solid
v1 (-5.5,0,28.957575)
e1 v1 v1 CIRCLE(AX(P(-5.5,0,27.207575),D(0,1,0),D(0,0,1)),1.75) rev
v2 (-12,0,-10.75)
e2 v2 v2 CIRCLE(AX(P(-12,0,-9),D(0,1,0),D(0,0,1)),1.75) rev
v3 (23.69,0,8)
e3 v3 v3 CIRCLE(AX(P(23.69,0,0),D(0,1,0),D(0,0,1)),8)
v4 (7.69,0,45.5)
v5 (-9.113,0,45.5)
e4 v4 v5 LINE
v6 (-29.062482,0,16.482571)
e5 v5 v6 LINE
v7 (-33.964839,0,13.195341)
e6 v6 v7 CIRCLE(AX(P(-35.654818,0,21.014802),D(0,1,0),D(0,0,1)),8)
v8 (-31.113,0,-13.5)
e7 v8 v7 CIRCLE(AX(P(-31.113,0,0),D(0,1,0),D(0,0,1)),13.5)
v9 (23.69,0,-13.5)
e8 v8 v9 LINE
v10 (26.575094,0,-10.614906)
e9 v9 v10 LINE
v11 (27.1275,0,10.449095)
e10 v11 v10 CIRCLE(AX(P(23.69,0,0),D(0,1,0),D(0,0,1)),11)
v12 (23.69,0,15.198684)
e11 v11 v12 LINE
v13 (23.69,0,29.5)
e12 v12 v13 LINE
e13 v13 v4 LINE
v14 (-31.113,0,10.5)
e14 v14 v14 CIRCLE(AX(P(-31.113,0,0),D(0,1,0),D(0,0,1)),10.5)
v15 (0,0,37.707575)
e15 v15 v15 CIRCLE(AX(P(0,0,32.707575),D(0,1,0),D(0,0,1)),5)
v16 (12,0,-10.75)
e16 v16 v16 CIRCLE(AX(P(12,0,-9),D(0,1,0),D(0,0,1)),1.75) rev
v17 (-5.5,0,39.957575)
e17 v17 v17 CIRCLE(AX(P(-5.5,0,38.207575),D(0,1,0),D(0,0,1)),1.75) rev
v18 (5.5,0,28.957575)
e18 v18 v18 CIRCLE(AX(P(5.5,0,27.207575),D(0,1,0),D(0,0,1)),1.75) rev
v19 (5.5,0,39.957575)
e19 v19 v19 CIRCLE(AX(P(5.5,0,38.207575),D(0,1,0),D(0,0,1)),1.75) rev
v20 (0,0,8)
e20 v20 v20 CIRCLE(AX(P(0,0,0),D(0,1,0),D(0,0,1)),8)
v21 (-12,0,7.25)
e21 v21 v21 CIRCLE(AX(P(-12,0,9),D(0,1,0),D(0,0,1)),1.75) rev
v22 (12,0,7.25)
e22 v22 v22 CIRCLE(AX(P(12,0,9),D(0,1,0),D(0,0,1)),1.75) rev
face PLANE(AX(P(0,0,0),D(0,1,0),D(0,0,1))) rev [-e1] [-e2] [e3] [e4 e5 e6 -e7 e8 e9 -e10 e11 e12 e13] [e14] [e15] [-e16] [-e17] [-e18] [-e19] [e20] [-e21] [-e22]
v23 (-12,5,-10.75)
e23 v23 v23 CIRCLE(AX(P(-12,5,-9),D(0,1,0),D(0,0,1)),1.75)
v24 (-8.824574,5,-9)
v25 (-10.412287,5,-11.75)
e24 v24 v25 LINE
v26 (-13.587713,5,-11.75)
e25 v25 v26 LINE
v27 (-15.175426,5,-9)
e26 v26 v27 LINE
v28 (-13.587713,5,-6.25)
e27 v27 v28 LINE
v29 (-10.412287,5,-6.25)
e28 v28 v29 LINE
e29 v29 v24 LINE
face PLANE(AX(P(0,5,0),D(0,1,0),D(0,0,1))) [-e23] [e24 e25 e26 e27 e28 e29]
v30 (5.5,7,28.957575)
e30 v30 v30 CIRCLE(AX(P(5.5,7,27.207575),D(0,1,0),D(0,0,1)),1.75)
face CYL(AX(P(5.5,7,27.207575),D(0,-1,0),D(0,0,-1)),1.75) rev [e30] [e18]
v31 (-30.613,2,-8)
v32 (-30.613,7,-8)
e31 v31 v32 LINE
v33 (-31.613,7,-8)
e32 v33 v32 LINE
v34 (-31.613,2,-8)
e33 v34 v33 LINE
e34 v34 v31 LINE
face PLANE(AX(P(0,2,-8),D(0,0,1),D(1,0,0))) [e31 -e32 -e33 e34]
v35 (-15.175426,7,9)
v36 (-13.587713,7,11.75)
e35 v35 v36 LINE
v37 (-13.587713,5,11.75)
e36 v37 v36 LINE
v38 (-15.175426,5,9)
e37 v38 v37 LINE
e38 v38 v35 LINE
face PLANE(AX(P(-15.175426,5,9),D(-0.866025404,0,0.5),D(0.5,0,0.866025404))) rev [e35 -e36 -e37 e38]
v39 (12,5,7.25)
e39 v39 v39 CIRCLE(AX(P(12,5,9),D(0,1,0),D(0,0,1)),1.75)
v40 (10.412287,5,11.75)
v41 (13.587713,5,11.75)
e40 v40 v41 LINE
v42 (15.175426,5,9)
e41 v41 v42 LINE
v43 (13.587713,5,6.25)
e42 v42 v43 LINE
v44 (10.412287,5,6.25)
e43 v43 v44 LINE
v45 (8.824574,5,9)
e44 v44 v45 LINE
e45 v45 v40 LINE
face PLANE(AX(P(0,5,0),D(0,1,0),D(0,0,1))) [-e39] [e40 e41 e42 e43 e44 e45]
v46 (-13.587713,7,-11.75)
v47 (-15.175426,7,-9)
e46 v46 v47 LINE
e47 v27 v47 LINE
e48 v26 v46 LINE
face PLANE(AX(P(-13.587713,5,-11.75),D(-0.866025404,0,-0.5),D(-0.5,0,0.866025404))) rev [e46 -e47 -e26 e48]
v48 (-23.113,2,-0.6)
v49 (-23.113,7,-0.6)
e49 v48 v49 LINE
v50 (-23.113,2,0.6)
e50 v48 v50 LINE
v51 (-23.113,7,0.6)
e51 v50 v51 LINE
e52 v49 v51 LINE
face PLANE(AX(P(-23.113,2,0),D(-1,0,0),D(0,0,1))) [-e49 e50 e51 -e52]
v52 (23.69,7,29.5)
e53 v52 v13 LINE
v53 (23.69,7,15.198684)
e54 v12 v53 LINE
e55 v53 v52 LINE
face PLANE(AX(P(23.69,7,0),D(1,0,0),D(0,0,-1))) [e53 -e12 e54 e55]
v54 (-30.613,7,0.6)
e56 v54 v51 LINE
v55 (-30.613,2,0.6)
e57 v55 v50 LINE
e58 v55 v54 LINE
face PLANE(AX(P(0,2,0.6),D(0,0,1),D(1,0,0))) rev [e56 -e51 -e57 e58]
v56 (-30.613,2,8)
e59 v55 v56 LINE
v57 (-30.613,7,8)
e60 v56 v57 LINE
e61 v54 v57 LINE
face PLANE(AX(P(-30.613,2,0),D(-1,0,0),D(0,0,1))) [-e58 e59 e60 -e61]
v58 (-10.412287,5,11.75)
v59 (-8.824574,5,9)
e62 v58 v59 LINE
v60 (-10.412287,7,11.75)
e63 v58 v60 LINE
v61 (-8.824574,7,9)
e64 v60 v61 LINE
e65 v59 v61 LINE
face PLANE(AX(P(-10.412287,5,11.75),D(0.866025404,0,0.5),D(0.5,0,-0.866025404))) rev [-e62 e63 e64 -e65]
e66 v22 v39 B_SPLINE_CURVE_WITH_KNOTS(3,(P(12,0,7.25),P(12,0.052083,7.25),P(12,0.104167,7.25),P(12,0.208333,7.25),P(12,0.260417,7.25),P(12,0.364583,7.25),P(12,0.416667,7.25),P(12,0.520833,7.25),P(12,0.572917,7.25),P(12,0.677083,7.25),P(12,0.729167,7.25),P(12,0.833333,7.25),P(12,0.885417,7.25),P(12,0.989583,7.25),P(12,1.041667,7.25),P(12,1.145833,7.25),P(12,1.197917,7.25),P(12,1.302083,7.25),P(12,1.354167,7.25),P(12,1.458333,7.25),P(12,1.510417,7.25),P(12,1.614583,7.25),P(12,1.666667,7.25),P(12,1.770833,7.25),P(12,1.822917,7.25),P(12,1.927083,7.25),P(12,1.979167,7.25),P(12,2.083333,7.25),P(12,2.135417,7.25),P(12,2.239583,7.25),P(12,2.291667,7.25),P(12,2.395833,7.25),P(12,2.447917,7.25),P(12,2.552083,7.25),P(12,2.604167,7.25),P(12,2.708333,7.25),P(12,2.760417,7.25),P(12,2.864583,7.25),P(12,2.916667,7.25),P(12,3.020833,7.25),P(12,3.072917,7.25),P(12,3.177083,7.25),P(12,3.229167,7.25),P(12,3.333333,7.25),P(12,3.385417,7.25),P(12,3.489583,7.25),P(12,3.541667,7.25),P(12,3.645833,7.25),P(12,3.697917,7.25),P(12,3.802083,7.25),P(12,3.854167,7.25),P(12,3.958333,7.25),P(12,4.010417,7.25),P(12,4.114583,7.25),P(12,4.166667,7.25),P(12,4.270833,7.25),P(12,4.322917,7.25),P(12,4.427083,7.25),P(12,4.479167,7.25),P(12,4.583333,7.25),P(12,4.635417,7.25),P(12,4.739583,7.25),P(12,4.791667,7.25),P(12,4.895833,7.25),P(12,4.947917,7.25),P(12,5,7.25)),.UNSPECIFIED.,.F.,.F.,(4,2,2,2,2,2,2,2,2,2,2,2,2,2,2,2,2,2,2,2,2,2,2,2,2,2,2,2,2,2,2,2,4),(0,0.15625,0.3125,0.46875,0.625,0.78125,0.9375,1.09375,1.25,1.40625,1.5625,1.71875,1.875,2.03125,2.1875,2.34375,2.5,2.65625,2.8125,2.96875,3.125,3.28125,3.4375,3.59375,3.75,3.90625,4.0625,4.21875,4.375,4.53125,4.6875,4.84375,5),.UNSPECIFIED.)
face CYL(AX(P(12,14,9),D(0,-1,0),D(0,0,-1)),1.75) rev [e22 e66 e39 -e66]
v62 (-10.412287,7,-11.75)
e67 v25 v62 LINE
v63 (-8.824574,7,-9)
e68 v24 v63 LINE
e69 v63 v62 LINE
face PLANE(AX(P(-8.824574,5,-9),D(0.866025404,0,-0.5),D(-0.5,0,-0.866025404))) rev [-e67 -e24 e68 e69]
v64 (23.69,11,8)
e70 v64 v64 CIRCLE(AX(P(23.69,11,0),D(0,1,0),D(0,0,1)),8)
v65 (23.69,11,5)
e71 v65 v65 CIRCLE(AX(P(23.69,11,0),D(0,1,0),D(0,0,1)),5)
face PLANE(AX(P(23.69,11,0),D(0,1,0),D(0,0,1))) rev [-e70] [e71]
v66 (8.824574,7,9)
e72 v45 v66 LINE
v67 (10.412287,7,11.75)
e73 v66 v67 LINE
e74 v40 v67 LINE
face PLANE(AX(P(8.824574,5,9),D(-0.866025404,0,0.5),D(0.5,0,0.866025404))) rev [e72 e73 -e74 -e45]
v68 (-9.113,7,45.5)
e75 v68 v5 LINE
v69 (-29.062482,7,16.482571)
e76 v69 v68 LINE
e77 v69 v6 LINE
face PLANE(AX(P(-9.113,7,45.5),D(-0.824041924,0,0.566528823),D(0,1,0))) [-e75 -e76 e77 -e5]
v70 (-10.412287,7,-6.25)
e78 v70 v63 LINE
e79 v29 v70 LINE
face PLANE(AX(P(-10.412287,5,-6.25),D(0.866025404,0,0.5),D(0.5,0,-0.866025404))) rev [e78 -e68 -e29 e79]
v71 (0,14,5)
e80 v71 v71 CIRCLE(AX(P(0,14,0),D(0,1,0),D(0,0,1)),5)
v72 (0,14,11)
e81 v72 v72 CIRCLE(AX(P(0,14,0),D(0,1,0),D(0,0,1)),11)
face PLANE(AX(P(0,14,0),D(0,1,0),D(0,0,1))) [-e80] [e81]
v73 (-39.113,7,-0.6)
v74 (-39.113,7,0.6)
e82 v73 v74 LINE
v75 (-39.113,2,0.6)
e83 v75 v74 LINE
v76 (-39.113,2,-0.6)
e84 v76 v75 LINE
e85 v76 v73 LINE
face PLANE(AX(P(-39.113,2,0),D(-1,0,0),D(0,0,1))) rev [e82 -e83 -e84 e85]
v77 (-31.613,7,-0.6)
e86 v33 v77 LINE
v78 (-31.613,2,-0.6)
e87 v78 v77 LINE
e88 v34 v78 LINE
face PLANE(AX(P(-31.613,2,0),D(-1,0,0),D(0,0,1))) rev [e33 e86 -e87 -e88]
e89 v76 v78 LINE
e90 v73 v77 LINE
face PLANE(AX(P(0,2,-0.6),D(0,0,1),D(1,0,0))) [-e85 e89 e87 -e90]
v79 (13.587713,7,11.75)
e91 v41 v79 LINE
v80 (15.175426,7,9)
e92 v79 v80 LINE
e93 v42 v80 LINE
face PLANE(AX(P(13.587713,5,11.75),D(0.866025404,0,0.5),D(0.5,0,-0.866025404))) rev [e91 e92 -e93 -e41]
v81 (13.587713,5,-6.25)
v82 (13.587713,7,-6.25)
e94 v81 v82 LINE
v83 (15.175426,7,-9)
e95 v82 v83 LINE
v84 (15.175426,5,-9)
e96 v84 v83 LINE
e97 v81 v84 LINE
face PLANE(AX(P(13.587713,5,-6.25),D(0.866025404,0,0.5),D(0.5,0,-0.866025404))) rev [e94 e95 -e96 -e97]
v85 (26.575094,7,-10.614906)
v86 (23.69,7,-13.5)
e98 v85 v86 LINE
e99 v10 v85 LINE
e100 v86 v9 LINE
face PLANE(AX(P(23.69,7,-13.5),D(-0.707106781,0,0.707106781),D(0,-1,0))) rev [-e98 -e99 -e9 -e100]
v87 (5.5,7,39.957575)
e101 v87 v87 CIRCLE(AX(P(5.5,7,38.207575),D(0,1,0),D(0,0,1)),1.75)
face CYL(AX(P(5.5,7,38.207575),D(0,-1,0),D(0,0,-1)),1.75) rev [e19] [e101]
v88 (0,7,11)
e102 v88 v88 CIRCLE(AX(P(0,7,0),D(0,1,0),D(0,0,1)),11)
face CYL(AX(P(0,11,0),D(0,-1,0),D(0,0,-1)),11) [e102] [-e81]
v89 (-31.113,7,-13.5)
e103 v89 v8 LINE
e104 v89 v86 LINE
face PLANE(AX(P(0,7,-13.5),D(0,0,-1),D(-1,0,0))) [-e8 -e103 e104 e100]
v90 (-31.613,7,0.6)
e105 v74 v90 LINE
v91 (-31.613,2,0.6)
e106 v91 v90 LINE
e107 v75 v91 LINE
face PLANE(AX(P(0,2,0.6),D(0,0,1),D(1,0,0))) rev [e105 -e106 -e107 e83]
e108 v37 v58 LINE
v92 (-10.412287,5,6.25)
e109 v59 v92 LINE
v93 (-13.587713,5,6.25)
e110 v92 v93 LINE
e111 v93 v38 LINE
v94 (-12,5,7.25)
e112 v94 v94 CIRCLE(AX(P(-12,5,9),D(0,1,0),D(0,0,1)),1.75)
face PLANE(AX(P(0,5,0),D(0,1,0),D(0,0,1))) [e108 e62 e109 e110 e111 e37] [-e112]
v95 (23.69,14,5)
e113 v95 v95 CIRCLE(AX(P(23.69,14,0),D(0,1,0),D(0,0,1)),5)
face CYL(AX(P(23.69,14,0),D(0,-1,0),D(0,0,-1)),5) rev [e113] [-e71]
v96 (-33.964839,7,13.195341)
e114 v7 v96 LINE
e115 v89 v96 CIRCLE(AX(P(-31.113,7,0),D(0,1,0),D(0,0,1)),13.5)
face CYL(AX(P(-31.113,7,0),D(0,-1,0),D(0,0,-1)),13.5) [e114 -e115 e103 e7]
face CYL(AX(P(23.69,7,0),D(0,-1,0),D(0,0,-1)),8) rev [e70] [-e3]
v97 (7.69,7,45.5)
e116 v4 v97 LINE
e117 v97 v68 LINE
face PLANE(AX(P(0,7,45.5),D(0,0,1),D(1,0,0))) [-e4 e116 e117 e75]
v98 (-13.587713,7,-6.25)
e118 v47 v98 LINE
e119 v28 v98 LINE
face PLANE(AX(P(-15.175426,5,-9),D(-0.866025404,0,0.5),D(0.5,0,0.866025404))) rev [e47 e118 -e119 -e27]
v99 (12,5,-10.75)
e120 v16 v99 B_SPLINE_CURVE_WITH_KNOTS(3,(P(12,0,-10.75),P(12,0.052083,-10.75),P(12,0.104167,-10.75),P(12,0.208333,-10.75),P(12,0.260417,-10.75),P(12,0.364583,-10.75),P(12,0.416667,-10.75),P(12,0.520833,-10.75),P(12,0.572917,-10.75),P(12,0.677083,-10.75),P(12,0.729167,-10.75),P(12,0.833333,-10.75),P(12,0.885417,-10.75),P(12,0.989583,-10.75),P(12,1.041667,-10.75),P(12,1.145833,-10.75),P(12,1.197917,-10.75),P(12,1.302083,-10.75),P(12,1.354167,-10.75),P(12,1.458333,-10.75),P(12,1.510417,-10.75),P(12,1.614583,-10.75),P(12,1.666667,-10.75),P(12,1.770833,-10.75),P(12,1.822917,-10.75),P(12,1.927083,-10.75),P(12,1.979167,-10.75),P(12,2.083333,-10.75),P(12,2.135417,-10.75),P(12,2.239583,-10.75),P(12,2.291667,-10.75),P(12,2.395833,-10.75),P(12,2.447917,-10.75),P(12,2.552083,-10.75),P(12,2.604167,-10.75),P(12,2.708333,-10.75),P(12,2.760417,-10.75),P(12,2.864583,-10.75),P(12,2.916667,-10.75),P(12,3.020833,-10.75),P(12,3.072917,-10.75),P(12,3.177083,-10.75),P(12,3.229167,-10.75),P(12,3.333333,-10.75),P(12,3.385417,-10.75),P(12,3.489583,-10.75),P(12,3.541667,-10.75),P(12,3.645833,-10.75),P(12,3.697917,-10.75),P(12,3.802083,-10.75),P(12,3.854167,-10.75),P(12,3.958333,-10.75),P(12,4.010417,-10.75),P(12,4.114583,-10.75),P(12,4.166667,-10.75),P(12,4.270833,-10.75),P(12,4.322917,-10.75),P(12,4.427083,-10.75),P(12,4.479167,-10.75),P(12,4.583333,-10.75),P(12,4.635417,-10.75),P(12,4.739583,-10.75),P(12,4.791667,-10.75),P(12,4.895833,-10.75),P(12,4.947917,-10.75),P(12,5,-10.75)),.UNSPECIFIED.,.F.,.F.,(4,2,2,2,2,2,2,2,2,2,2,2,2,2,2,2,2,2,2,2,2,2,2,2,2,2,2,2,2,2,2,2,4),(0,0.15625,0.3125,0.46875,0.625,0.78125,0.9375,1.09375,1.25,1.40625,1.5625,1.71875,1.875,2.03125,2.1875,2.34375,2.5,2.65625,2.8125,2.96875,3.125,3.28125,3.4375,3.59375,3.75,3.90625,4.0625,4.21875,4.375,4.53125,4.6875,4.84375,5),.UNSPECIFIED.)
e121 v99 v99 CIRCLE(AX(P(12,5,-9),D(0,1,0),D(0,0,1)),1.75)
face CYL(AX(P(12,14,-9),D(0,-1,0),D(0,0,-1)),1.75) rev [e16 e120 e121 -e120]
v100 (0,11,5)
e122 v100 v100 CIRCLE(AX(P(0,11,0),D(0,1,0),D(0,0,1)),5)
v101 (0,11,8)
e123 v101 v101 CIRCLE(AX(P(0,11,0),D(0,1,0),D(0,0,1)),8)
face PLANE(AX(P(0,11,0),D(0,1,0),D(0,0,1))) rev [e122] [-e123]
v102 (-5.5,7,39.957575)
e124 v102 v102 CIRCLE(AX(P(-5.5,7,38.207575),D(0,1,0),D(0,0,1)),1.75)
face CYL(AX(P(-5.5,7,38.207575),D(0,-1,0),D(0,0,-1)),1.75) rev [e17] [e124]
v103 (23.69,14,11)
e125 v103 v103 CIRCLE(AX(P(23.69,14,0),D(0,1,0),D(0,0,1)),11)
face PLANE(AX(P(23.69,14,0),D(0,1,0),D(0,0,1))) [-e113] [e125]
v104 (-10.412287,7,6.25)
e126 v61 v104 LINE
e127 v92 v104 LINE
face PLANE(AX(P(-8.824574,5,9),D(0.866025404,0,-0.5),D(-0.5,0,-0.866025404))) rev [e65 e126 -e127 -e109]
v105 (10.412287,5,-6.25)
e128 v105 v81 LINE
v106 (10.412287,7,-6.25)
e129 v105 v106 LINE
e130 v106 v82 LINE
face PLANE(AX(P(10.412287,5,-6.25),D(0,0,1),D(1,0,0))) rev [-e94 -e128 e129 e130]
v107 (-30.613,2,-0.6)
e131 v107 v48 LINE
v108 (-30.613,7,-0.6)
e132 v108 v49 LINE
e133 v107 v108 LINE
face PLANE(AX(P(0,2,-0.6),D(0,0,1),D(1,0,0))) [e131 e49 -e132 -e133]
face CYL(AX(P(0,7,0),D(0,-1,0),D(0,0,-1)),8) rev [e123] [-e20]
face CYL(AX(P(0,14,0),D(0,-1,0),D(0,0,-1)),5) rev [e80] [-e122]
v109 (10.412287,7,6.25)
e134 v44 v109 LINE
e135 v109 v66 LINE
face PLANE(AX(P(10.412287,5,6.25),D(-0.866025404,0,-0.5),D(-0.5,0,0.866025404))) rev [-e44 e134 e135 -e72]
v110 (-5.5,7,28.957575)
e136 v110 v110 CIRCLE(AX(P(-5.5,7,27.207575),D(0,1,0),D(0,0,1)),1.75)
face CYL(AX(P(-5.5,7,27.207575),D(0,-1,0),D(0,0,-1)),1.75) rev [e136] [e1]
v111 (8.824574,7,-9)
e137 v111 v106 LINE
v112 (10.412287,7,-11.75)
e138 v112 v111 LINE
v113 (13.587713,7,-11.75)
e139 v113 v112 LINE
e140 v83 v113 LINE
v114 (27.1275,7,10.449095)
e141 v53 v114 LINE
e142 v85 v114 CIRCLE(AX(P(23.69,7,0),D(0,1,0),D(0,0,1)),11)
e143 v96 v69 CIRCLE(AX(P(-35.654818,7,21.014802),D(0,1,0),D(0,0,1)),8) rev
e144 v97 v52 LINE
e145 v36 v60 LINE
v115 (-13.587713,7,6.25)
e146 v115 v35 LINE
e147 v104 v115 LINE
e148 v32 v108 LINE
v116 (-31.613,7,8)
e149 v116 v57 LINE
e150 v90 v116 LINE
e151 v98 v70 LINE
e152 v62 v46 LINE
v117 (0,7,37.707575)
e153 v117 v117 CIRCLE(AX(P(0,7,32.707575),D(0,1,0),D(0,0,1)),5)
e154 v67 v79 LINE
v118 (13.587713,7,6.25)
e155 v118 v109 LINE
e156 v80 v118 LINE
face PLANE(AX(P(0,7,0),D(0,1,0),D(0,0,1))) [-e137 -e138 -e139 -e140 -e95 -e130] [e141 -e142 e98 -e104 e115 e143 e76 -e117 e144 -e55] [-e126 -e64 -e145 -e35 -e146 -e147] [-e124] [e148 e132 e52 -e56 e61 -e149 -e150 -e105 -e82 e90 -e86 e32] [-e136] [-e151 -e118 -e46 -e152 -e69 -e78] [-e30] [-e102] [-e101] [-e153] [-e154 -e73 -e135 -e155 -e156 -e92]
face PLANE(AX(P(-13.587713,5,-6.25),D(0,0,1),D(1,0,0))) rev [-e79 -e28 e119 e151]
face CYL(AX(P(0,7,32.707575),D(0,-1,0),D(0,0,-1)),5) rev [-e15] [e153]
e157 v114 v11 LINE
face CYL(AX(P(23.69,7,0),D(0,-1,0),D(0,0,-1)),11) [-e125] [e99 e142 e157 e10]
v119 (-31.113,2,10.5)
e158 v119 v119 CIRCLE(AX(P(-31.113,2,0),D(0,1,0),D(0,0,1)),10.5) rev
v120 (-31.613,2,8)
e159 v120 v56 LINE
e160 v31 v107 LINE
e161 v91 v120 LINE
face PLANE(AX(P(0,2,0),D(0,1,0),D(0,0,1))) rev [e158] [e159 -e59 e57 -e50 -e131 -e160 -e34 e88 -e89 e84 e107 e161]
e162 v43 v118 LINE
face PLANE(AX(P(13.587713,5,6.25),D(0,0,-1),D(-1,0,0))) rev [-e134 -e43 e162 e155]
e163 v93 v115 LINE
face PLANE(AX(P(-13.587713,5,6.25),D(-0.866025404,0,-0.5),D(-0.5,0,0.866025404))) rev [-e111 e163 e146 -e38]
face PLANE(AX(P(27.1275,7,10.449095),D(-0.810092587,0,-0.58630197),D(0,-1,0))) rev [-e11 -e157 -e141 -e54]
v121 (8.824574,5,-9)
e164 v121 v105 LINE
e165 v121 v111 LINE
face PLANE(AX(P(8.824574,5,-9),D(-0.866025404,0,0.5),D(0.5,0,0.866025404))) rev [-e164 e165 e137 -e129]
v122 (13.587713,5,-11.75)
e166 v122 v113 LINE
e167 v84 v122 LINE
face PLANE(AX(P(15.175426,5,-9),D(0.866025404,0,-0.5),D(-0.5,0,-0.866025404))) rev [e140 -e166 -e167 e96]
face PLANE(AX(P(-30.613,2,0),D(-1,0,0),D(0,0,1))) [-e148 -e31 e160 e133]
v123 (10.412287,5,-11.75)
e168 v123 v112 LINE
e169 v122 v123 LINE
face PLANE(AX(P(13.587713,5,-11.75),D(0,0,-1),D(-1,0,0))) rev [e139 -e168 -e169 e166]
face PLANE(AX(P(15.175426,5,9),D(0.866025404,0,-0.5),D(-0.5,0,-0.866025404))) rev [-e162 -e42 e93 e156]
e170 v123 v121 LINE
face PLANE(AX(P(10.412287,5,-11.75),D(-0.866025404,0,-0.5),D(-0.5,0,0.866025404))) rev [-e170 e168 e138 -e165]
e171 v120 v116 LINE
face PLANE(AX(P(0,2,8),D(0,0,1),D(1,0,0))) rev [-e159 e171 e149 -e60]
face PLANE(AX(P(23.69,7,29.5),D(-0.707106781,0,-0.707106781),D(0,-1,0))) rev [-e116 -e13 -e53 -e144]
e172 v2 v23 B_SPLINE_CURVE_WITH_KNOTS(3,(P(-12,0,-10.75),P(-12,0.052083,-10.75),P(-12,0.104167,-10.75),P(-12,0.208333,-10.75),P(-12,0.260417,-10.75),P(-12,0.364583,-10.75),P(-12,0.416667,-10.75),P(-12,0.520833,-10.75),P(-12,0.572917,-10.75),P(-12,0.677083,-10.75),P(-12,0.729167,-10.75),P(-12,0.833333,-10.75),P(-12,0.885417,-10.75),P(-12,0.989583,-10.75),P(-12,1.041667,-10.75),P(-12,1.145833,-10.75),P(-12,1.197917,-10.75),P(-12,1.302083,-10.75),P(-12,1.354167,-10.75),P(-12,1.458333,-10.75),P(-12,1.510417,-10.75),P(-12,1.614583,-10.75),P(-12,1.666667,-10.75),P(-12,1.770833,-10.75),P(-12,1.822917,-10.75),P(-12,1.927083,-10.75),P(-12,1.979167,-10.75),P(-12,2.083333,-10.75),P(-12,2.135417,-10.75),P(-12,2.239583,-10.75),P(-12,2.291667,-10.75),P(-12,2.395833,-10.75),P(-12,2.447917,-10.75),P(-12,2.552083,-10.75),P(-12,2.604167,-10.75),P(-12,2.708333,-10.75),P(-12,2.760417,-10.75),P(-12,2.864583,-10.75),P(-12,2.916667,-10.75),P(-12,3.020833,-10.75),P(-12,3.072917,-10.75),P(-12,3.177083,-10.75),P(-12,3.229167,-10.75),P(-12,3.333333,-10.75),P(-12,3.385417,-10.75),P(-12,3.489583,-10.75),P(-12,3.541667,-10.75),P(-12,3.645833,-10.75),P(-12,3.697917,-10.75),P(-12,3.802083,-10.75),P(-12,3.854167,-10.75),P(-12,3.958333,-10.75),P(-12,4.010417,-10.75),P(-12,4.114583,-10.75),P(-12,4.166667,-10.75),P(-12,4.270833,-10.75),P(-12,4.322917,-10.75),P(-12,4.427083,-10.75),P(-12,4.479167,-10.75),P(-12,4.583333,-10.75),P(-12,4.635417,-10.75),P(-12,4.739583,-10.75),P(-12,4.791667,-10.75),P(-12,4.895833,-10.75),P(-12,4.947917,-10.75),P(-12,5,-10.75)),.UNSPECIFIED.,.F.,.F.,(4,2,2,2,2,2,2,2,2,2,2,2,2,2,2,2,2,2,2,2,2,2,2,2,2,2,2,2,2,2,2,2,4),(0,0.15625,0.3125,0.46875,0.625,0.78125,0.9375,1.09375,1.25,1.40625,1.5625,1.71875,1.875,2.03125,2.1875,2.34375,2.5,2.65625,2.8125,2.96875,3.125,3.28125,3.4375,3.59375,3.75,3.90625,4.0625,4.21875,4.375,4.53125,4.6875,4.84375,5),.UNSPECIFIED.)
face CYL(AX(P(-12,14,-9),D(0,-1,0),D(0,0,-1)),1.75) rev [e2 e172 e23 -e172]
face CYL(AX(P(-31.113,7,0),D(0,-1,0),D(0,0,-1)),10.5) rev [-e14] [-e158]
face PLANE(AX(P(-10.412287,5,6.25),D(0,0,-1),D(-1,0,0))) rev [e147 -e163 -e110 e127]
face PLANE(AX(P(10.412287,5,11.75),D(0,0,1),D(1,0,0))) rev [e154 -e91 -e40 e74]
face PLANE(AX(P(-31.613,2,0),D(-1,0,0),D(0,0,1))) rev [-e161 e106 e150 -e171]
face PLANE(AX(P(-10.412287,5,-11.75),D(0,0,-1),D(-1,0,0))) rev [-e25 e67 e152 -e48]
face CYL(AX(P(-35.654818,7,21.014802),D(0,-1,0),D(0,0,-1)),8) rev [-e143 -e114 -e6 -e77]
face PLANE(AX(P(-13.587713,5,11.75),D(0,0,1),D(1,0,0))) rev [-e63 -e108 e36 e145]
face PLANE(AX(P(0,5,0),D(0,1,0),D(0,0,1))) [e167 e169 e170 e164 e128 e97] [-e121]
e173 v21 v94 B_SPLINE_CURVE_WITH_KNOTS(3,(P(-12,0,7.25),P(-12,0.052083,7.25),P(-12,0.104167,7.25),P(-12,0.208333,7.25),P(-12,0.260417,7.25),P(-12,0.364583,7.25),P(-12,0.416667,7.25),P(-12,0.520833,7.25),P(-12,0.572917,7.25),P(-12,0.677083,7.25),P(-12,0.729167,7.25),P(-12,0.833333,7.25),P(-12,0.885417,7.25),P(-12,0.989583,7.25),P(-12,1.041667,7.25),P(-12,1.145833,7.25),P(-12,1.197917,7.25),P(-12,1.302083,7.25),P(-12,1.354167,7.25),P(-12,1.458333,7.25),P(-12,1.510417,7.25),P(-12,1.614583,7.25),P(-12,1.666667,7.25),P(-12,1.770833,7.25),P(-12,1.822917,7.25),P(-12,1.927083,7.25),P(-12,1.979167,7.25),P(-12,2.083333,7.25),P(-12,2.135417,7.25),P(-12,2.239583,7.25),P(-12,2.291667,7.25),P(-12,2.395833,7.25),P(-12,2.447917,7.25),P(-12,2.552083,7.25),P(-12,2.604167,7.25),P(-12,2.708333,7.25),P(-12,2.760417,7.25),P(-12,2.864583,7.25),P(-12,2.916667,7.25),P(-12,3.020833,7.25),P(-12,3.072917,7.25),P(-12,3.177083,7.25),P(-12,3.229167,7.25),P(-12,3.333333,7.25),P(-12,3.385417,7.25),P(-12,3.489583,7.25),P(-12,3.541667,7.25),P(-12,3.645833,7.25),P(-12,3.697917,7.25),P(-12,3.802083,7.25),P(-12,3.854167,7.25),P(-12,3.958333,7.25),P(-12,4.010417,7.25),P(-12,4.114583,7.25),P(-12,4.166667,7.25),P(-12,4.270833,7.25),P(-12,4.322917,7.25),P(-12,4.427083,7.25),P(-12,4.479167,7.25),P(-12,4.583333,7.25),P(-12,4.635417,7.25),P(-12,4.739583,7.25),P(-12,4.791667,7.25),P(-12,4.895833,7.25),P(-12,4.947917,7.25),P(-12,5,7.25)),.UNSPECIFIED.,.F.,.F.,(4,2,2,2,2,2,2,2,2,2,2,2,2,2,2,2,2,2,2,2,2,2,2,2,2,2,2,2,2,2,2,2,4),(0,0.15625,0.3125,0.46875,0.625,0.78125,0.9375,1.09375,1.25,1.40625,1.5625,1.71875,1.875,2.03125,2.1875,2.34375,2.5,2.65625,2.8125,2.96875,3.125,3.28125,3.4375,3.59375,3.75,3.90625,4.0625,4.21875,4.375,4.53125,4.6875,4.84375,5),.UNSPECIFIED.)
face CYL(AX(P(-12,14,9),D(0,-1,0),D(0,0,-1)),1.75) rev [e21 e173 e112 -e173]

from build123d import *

# Parameters (mm, degrees)
SKETCH3_R               = 8
SKETCH3_W               = 54.803
SKETCH3_H               = 32
SKETCH3_R_2             = 5
BOSS_EXTRUDE1_DEPTH     = 7
CUT_EXTRUDE3_DEPTH      = 65.105926161
CUT_EXTRUDE3_DEPTH_BACK = 65.105926161
SKETCH4_R               = 1.75
SKETCH6_R               = 11
SKETCH6_R_2             = 8
BOSS_EXTRUDE2_DEPTH     = 4
SKETCH7_R               = 11
SKETCH7_R_2             = 5
BOSS_EXTRUDE3_DEPTH     = 3
CHAMFER1_SIZE           = 2.5
CUT_EXTRUDE5_DEPTH      = 66.242392422
CUT_EXTRUDE5_DEPTH_BACK = 66.242392422
SKETCH9_R               = 1.75
CUT_EXTRUDE6_START      = -2
SKETCH10_R              = 1.75
CUT_EXTRUDE6_DEPTH      = 2
CHAMFER3_SIZE2          = 32
CHAMFER3_SIZE           = 22
CHAMFER4_SIZE           = 16
FILLET1_DEPTH           = 7
BOSS_EXTRUDE6_START     = -5
SKETCH15_R              = 10.5
BOSS_EXTRUDE6_DEPTH     = 5


with BuildPart() as part:
    # Sketch3 → Boss-Extrude1 (new body)
    # profile 1 of 10: a face of its own
    with BuildSketch(Plane(origin=(0, 0, 0), x_dir=(1, 0, 0), z_dir=(0, 1, 0))):
        with BuildLine():
            ThreePointArc((-17.613, 0), (-21.567058454, 9.545941546), (-31.113, 13.5))
            Line((-31.113, 13.5), (-31.113, 10.5))
            ThreePointArc((-31.113, 10.5), (-23.688378798, 7.424621202), (-20.613, 0))
            ThreePointArc((-20.613, 0), (-23.688378798, -7.424621202), (-31.113, -10.5))
            Line((-31.113, -10.5), (-31.113, -13.5))
            ThreePointArc((-31.113, -13.5), (-21.567058454, -9.545941546), (-17.613, 0))
        make_face()
    # profile 2 of 10: a face of its own
    with BuildSketch(Plane(origin=(0, 0, 0), x_dir=(1, 0, 0), z_dir=(0, 1, 0))):
        with BuildLine():
            Line((-31.113, 10.5), (-31.113, 13.5))
            ThreePointArc((-31.113, 13.5), (-44.613, 0), (-31.113, -13.5))
            Line((-31.113, -13.5), (-31.113, -10.5))
            ThreePointArc((-31.113, -10.5), (-41.613, 0), (-31.113, 10.5))
        make_face()
    # profile 3 of 10: a face of its own
    with BuildSketch(Plane(origin=(0, 0, 0), x_dir=(1, 0, 0), z_dir=(0, 1, 0))):
        with BuildLine():
            Line((23.69, 13.5), (-31.113, 13.5))
            ThreePointArc((-31.113, 13.5), (-21.567058454, 9.545941546), (-17.613, 0))
            ThreePointArc((-17.613, 0), (-21.567058454, -9.545941546), (-31.113, -13.5))
            Line((-31.113, -13.5), (23.69, -13.5))
            Line((23.69, -13.5), (23.69, -11))
            ThreePointArc((23.69, -11), (12.69, 0), (23.69, 11))
            Line((23.69, 11), (23.69, 13.5))
        make_face()
        with Locations(Location((0, 0, 0), (0, 0, 270))):
            Circle(SKETCH3_R, mode=Mode.SUBTRACT)
    # profile 4 of 10: a face of its own
    with BuildSketch(Plane(origin=(0, 0, 0), x_dir=(1, 0, 0), z_dir=(0, 1, 0))):
        with BuildLine():
            ThreePointArc((-17.613, 0), (-21.567058454, 9.545941546), (-31.113, 13.5))
            Line((-31.113, 13.5), (-31.113, 10.5))
            ThreePointArc((-31.113, 10.5), (-23.688378798, 7.424621202), (-20.613, 0))
            ThreePointArc((-20.613, 0), (-23.688378798, -7.424621202), (-31.113, -10.5))
            Line((-31.113, -10.5), (-31.113, -13.5))
            ThreePointArc((-31.113, -13.5), (-21.567058454, -9.545941546), (-17.613, 0))
        make_face()
    # profile 5 of 10: a face of its own
    with BuildSketch(Plane(origin=(0, 0, 0), x_dir=(1, 0, 0), z_dir=(0, 1, 0))):
        with BuildLine():
            Line((-31.113, 10.5), (-31.113, 13.5))
            ThreePointArc((-31.113, 13.5), (-44.613, 0), (-31.113, -13.5))
            Line((-31.113, -13.5), (-31.113, -10.5))
            ThreePointArc((-31.113, -10.5), (-41.613, 0), (-31.113, 10.5))
        make_face()
    # profile 6 of 10: a face of its own
    with BuildSketch(Plane(origin=(0, 0, 0), x_dir=(1, 0, 0), z_dir=(0, 1, 0))):
        with BuildLine():
            ThreePointArc((34.69, 0), (31.468174593, 7.778174593), (23.69, 11))
            Line((23.69, 11), (23.69, 8))
            ThreePointArc((23.69, 8), (29.346854249, 5.656854249), (31.69, 0))
            ThreePointArc((31.69, 0), (29.346854249, -5.656854249), (23.69, -8))
            Line((23.69, -8), (23.69, -11))
            ThreePointArc((23.69, -11), (31.468174593, -7.778174593), (34.69, 0))
        make_face()
    # profile 7 of 10: a face of its own
    with BuildSketch(Plane(origin=(0, 0, 0), x_dir=(1, 0, 0), z_dir=(0, 1, 0))):
        with BuildLine():
            Line((23.69, 8), (23.69, 11))
            ThreePointArc((23.69, 11), (12.69, 0), (23.69, -11))
            Line((23.69, -11), (23.69, -8))
            ThreePointArc((23.69, -8), (15.69, 0), (23.69, 8))
        make_face()
    # profile 8 of 10: a face of its own
    with BuildSketch(Plane(origin=(0, 0, 0), x_dir=(1, 0, 0), z_dir=(0, 1, 0))):
        with Locations((-3.7115, -29.5)):
            Rectangle(SKETCH3_W, SKETCH3_H)
        with Locations(Location((0, -32.707574931, 0), (0, 0, 270))):
            Circle(SKETCH3_R_2, mode=Mode.SUBTRACT)
    # profile 9 of 10: a face of its own
    with BuildSketch(Plane(origin=(0, 0, 0), x_dir=(1, 0, 0), z_dir=(0, 1, 0))):
        with BuildLine():
            ThreePointArc((34.69, 0), (31.468174593, 7.778174593), (23.69, 11))
            Line((23.69, 11), (23.69, 8))
            ThreePointArc((23.69, 8), (29.346854249, 5.656854249), (31.69, 0))
            ThreePointArc((31.69, 0), (29.346854249, -5.656854249), (23.69, -8))
            Line((23.69, -8), (23.69, -11))
            ThreePointArc((23.69, -11), (31.468174593, -7.778174593), (34.69, 0))
        make_face()
    # profile 10 of 10: a face of its own
    with BuildSketch(Plane(origin=(0, 0, 0), x_dir=(1, 0, 0), z_dir=(0, 1, 0))):
        with BuildLine():
            Line((23.69, 8), (23.69, 11))
            ThreePointArc((23.69, 11), (12.69, 0), (23.69, -11))
            Line((23.69, -11), (23.69, -8))
            ThreePointArc((23.69, -8), (15.69, 0), (23.69, 8))
        make_face()
    extrude(amount=BOSS_EXTRUDE1_DEPTH)

    # Sketch4 → Cut-Extrude3 (cut, two sides: drawn at the far end of the back side and taken through both)
    with BuildSketch(Plane(origin=(0, 0, 0), x_dir=(1, 0, 0), z_dir=(0, 1, 0)).offset(-CUT_EXTRUDE3_DEPTH_BACK)):
        with Locations(Location((5.5, -27.207574931, 0), (0, 0, 270))):
            Circle(SKETCH4_R)
        with Locations(Location((5.5, -38.207574931, 0), (0, 0, 270))):
            Circle(SKETCH4_R)
        with Locations(Location((-5.5, -38.207574931, 0), (0, 0, 270))):
            Circle(SKETCH4_R)
        with Locations(Location((-5.5, -27.207574931, 0), (0, 0, 270))):
            Circle(SKETCH4_R)
    extrude(amount=CUT_EXTRUDE3_DEPTH + CUT_EXTRUDE3_DEPTH_BACK, mode=Mode.SUBTRACT)

    # Sketch6 → Boss-Extrude2 (add)
    # profile 1 of 2: a face of its own
    with BuildSketch(Plane(origin=(0, 7, 0), x_dir=(1, 0, 0), z_dir=(0, 1, 0))):
        with Locations(Location((23.69, 0, 0), (0, 0, 270))):
            Circle(SKETCH6_R)
        with Locations(Location((23.69, 0, 0), (0, 0, 270))):
            Circle(SKETCH6_R_2, mode=Mode.SUBTRACT)
    # profile 2 of 2: a face of its own
    with BuildSketch(Plane(origin=(0, 7, 0), x_dir=(1, 0, 0), z_dir=(0, 1, 0))):
        with Locations(Location((0, 0, 0), (0, 0, 270))):
            Circle(SKETCH6_R)
        with Locations(Location((0, 0, 0), (0, 0, 270))):
            Circle(SKETCH6_R_2, mode=Mode.SUBTRACT)
    extrude(amount=BOSS_EXTRUDE2_DEPTH)

    # Sketch7 → Boss-Extrude3 (add)
    # profile 1 of 2: a face of its own
    with BuildSketch(Plane(origin=(0, 11, 0), x_dir=(1, 0, 0), z_dir=(0, 1, 0))):
        with Locations(Location((23.69, 0, 0), (0, 0, 270))):
            Circle(SKETCH7_R)
        with Locations(Location((23.69, 0, 0), (0, 0, 270))):
            Circle(SKETCH7_R_2, mode=Mode.SUBTRACT)
    # profile 2 of 2: a face of its own
    with BuildSketch(Plane(origin=(0, 11, 0), x_dir=(1, 0, 0), z_dir=(0, 1, 0))):
        with Locations(Location((0, 0, 0), (0, 0, 270))):
            Circle(SKETCH7_R)
        with Locations(Location((0, 0, 0), (0, 0, 270))):
            Circle(SKETCH7_R_2, mode=Mode.SUBTRACT)
    extrude(amount=BOSS_EXTRUDE3_DEPTH)

    # Chamfer1
    # the kernel refuses this chamfer: 2.5 mm, written as the material it adds along each edge
    with BuildSketch(Plane(origin=(23.69, 0, -11), x_dir=(0.9912092295509807, 0, 0.13230367815352426), z_dir=(0, 1, 0))) as chamfer1_piece_1_section:
        with BuildLine():
            Line((2.910680919, 0), (-CHAMFER1_SIZE * 0.132303678154, CHAMFER1_SIZE * 0.991209229551))
            Line((-CHAMFER1_SIZE * 0.132303678154, CHAMFER1_SIZE * 0.991209229551), (0, 0))
            ThreePointArc((0, 0), (1.49552658, 0.096625069), (2.910680919, 0))
        make_face()
    chamfer1_piece_1 = extrude(amount=7, mode=Mode.PRIVATE)
    chamfer1_piece_1 = split(chamfer1_piece_1, bisect_by=Plane(origin=(23.69, 0, -13.5), z_dir=(0, 0, 1)), keep=Keep.TOP, mode=Mode.PRIVATE)
    add(chamfer1_piece_1)

    # Sketch9 → Cut-Extrude5 (cut, two sides: drawn at the far end of the back side and taken through both)
    with BuildSketch(Plane(origin=(0, 0, 0), x_dir=(1, 0, 0), z_dir=(0, 1, 0)).offset(-CUT_EXTRUDE5_DEPTH_BACK)):
        with Locations(Location((12, 9, 0), (0, 0, 90))):
            Circle(SKETCH9_R)
        with Locations(Location((12, -9, 0), (0, 0, 90))):
            Circle(SKETCH9_R)
        with Locations(Location((-12, -9, 0), (0, 0, 90))):
            Circle(SKETCH9_R)
        with Locations(Location((-12, 9, 0), (0, 0, 90))):
            Circle(SKETCH9_R)
    extrude(amount=CUT_EXTRUDE5_DEPTH + CUT_EXTRUDE5_DEPTH_BACK, mode=Mode.SUBTRACT)

    # Sketch10 → Cut-Extrude6 (cut)
    # profile 1 of 4: a face of its own
    with BuildSketch(Plane(origin=(0, 7, 0), x_dir=(1, 0, 0), z_dir=(0, 1, 0)).offset(CUT_EXTRUDE6_START)):
        Polygon((-15.175426481, -9), (-13.58771324, -11.75), (-10.41228676, -11.75), (-8.824573519, -9), (-10.41228676, -6.25), (-13.58771324, -6.25), align=None)
        with Locations(Location((-12, -9, 0), (0, 0, 90))):
            Circle(SKETCH10_R, mode=Mode.SUBTRACT)
    # profile 2 of 4: a face of its own
    with BuildSketch(Plane(origin=(0, 7, 0), x_dir=(1, 0, 0), z_dir=(0, 1, 0)).offset(CUT_EXTRUDE6_START)):
        Polygon((-15.175426481, 9), (-13.58771324, 6.25), (-10.41228676, 6.25), (-8.824573519, 9), (-10.41228676, 11.75), (-13.58771324, 11.75), align=None)
        with Locations(Location((-12, 9, 0), (0, 0, 90))):
            Circle(SKETCH10_R, mode=Mode.SUBTRACT)
    # profile 3 of 4: a face of its own
    with BuildSketch(Plane(origin=(0, 7, 0), x_dir=(1, 0, 0), z_dir=(0, 1, 0)).offset(CUT_EXTRUDE6_START)):
        Polygon((15.175426481, 9), (13.58771324, 11.75), (10.41228676, 11.75), (8.824573519, 9), (10.41228676, 6.25), (13.58771324, 6.25), align=None)
        with Locations(Location((12, 9, 0), (0, 0, 90))):
            Circle(SKETCH10_R, mode=Mode.SUBTRACT)
    # profile 4 of 4: a face of its own
    with BuildSketch(Plane(origin=(0, 7, 0), x_dir=(1, 0, 0), z_dir=(0, 1, 0)).offset(CUT_EXTRUDE6_START)):
        Polygon((15.175426481, -9), (13.58771324, -6.25), (10.41228676, -6.25), (8.824573519, -9), (10.41228676, -11.75), (13.58771324, -11.75), align=None)
        with Locations(Location((12, -9, 0), (0, 0, 90))):
            Circle(SKETCH10_R, mode=Mode.SUBTRACT)
    extrude(amount=CUT_EXTRUDE6_DEPTH, mode=Mode.SUBTRACT)

    # Chamfer2
    # the kernel refuses this chamfer: 5 mm, written as the material it adds along each edge
    with BuildSketch(Plane(origin=(23.69, 0, 11), x_dir=(0.9874000606639179, 0, -0.15824386307497393), z_dir=(0, 1, 0))) as chamfer2_piece_1:
        with BuildLine():
            Line((3.622786344, 0.141421356), (-0.805837357, -4.287202344))
            Line((-0.805837357, -4.287202344), (-0.904577363, -4.271377958))
            ThreePointArc((-0.904577363, -4.271377958), (-0.443767224, -2.137054655), (-0.098740006, 0.015824386))
            Line((-0.098740006, 0.015824386), (0.015824386, 0.098740006))
            ThreePointArc((0.015824386, 0.098740006), (1.81210794, -0.038365312), (3.606961958, 0.240161362))
            Line((3.606961958, 0.240161362), (3.622786344, 0.141421356))
        make_face()
    extrude(amount=7)

    # Chamfer3
    chamfer3_edges = [part.edges().sort_by_distance(p)[0] for p in [
        (-31.113, 3.5, 45.5),
    ]]
    chamfer3_side = [part.faces().sort_by_distance(p)[0] for p in [
        (-30.673, 3.5, 45.5),
    ]]
    chamfer(chamfer3_edges, length=CHAMFER3_SIZE - 0.0001, length2=CHAMFER3_SIZE2 - 0.0001, reference=chamfer3_side[0])  # a hair under: the kernel refuses the full size

    # Chamfer4
    chamfer4_edges = [part.edges().sort_by_distance(p)[0] for p in [
        (23.69, 3.5, 45.5),
    ]]
    chamfer(chamfer4_edges, length=CHAMFER4_SIZE)

    # Fillet1: read off the stored shape, not the designer's step
    # Fillet1 outline → Fillet1 (add)
    with BuildSketch(Plane(origin=(0, 0, 0), x_dir=(1, 0, 0), z_dir=(0, 1, 0))):
        with BuildLine():
            ThreePointArc((-31.113, -13.5), (-32.547033058, -13.423619079), (-33.96483904, -13.19534062))
            ThreePointArc((-33.96483904, -13.19534062), (-31.199410591, -14.370304214), (-29.062482337, -16.482571146))
            Line((-29.062482337, -16.482571146), (-31.113, -13.5))
        make_face()
    extrude(amount=FILLET1_DEPTH)

    # Sketch15 → Boss-Extrude6 (add)
    with BuildSketch(Plane(origin=(0, 7, 0), x_dir=(1, 0, 0), z_dir=(0, 1, 0)).offset(BOSS_EXTRUDE6_START)):
        with Locations(Location((-31.113, 0, 0), (0, 0, 270))):
            Circle(SKETCH15_R)
        Polygon((-31.613, 0.6), (-31.613, 8), (-30.613, 8), (-30.613, 0.6), (-23.113, 0.6), (-23.113, -0.6), (-30.613, -0.6), (-30.613, -8), (-31.613, -8), (-31.613, -0.6), (-39.113, -0.6), (-39.113, 0.6), align=None, mode=Mode.SUBTRACT)
    extrude(amount=BOSS_EXTRUDE6_DEPTH)


solid = part.part
